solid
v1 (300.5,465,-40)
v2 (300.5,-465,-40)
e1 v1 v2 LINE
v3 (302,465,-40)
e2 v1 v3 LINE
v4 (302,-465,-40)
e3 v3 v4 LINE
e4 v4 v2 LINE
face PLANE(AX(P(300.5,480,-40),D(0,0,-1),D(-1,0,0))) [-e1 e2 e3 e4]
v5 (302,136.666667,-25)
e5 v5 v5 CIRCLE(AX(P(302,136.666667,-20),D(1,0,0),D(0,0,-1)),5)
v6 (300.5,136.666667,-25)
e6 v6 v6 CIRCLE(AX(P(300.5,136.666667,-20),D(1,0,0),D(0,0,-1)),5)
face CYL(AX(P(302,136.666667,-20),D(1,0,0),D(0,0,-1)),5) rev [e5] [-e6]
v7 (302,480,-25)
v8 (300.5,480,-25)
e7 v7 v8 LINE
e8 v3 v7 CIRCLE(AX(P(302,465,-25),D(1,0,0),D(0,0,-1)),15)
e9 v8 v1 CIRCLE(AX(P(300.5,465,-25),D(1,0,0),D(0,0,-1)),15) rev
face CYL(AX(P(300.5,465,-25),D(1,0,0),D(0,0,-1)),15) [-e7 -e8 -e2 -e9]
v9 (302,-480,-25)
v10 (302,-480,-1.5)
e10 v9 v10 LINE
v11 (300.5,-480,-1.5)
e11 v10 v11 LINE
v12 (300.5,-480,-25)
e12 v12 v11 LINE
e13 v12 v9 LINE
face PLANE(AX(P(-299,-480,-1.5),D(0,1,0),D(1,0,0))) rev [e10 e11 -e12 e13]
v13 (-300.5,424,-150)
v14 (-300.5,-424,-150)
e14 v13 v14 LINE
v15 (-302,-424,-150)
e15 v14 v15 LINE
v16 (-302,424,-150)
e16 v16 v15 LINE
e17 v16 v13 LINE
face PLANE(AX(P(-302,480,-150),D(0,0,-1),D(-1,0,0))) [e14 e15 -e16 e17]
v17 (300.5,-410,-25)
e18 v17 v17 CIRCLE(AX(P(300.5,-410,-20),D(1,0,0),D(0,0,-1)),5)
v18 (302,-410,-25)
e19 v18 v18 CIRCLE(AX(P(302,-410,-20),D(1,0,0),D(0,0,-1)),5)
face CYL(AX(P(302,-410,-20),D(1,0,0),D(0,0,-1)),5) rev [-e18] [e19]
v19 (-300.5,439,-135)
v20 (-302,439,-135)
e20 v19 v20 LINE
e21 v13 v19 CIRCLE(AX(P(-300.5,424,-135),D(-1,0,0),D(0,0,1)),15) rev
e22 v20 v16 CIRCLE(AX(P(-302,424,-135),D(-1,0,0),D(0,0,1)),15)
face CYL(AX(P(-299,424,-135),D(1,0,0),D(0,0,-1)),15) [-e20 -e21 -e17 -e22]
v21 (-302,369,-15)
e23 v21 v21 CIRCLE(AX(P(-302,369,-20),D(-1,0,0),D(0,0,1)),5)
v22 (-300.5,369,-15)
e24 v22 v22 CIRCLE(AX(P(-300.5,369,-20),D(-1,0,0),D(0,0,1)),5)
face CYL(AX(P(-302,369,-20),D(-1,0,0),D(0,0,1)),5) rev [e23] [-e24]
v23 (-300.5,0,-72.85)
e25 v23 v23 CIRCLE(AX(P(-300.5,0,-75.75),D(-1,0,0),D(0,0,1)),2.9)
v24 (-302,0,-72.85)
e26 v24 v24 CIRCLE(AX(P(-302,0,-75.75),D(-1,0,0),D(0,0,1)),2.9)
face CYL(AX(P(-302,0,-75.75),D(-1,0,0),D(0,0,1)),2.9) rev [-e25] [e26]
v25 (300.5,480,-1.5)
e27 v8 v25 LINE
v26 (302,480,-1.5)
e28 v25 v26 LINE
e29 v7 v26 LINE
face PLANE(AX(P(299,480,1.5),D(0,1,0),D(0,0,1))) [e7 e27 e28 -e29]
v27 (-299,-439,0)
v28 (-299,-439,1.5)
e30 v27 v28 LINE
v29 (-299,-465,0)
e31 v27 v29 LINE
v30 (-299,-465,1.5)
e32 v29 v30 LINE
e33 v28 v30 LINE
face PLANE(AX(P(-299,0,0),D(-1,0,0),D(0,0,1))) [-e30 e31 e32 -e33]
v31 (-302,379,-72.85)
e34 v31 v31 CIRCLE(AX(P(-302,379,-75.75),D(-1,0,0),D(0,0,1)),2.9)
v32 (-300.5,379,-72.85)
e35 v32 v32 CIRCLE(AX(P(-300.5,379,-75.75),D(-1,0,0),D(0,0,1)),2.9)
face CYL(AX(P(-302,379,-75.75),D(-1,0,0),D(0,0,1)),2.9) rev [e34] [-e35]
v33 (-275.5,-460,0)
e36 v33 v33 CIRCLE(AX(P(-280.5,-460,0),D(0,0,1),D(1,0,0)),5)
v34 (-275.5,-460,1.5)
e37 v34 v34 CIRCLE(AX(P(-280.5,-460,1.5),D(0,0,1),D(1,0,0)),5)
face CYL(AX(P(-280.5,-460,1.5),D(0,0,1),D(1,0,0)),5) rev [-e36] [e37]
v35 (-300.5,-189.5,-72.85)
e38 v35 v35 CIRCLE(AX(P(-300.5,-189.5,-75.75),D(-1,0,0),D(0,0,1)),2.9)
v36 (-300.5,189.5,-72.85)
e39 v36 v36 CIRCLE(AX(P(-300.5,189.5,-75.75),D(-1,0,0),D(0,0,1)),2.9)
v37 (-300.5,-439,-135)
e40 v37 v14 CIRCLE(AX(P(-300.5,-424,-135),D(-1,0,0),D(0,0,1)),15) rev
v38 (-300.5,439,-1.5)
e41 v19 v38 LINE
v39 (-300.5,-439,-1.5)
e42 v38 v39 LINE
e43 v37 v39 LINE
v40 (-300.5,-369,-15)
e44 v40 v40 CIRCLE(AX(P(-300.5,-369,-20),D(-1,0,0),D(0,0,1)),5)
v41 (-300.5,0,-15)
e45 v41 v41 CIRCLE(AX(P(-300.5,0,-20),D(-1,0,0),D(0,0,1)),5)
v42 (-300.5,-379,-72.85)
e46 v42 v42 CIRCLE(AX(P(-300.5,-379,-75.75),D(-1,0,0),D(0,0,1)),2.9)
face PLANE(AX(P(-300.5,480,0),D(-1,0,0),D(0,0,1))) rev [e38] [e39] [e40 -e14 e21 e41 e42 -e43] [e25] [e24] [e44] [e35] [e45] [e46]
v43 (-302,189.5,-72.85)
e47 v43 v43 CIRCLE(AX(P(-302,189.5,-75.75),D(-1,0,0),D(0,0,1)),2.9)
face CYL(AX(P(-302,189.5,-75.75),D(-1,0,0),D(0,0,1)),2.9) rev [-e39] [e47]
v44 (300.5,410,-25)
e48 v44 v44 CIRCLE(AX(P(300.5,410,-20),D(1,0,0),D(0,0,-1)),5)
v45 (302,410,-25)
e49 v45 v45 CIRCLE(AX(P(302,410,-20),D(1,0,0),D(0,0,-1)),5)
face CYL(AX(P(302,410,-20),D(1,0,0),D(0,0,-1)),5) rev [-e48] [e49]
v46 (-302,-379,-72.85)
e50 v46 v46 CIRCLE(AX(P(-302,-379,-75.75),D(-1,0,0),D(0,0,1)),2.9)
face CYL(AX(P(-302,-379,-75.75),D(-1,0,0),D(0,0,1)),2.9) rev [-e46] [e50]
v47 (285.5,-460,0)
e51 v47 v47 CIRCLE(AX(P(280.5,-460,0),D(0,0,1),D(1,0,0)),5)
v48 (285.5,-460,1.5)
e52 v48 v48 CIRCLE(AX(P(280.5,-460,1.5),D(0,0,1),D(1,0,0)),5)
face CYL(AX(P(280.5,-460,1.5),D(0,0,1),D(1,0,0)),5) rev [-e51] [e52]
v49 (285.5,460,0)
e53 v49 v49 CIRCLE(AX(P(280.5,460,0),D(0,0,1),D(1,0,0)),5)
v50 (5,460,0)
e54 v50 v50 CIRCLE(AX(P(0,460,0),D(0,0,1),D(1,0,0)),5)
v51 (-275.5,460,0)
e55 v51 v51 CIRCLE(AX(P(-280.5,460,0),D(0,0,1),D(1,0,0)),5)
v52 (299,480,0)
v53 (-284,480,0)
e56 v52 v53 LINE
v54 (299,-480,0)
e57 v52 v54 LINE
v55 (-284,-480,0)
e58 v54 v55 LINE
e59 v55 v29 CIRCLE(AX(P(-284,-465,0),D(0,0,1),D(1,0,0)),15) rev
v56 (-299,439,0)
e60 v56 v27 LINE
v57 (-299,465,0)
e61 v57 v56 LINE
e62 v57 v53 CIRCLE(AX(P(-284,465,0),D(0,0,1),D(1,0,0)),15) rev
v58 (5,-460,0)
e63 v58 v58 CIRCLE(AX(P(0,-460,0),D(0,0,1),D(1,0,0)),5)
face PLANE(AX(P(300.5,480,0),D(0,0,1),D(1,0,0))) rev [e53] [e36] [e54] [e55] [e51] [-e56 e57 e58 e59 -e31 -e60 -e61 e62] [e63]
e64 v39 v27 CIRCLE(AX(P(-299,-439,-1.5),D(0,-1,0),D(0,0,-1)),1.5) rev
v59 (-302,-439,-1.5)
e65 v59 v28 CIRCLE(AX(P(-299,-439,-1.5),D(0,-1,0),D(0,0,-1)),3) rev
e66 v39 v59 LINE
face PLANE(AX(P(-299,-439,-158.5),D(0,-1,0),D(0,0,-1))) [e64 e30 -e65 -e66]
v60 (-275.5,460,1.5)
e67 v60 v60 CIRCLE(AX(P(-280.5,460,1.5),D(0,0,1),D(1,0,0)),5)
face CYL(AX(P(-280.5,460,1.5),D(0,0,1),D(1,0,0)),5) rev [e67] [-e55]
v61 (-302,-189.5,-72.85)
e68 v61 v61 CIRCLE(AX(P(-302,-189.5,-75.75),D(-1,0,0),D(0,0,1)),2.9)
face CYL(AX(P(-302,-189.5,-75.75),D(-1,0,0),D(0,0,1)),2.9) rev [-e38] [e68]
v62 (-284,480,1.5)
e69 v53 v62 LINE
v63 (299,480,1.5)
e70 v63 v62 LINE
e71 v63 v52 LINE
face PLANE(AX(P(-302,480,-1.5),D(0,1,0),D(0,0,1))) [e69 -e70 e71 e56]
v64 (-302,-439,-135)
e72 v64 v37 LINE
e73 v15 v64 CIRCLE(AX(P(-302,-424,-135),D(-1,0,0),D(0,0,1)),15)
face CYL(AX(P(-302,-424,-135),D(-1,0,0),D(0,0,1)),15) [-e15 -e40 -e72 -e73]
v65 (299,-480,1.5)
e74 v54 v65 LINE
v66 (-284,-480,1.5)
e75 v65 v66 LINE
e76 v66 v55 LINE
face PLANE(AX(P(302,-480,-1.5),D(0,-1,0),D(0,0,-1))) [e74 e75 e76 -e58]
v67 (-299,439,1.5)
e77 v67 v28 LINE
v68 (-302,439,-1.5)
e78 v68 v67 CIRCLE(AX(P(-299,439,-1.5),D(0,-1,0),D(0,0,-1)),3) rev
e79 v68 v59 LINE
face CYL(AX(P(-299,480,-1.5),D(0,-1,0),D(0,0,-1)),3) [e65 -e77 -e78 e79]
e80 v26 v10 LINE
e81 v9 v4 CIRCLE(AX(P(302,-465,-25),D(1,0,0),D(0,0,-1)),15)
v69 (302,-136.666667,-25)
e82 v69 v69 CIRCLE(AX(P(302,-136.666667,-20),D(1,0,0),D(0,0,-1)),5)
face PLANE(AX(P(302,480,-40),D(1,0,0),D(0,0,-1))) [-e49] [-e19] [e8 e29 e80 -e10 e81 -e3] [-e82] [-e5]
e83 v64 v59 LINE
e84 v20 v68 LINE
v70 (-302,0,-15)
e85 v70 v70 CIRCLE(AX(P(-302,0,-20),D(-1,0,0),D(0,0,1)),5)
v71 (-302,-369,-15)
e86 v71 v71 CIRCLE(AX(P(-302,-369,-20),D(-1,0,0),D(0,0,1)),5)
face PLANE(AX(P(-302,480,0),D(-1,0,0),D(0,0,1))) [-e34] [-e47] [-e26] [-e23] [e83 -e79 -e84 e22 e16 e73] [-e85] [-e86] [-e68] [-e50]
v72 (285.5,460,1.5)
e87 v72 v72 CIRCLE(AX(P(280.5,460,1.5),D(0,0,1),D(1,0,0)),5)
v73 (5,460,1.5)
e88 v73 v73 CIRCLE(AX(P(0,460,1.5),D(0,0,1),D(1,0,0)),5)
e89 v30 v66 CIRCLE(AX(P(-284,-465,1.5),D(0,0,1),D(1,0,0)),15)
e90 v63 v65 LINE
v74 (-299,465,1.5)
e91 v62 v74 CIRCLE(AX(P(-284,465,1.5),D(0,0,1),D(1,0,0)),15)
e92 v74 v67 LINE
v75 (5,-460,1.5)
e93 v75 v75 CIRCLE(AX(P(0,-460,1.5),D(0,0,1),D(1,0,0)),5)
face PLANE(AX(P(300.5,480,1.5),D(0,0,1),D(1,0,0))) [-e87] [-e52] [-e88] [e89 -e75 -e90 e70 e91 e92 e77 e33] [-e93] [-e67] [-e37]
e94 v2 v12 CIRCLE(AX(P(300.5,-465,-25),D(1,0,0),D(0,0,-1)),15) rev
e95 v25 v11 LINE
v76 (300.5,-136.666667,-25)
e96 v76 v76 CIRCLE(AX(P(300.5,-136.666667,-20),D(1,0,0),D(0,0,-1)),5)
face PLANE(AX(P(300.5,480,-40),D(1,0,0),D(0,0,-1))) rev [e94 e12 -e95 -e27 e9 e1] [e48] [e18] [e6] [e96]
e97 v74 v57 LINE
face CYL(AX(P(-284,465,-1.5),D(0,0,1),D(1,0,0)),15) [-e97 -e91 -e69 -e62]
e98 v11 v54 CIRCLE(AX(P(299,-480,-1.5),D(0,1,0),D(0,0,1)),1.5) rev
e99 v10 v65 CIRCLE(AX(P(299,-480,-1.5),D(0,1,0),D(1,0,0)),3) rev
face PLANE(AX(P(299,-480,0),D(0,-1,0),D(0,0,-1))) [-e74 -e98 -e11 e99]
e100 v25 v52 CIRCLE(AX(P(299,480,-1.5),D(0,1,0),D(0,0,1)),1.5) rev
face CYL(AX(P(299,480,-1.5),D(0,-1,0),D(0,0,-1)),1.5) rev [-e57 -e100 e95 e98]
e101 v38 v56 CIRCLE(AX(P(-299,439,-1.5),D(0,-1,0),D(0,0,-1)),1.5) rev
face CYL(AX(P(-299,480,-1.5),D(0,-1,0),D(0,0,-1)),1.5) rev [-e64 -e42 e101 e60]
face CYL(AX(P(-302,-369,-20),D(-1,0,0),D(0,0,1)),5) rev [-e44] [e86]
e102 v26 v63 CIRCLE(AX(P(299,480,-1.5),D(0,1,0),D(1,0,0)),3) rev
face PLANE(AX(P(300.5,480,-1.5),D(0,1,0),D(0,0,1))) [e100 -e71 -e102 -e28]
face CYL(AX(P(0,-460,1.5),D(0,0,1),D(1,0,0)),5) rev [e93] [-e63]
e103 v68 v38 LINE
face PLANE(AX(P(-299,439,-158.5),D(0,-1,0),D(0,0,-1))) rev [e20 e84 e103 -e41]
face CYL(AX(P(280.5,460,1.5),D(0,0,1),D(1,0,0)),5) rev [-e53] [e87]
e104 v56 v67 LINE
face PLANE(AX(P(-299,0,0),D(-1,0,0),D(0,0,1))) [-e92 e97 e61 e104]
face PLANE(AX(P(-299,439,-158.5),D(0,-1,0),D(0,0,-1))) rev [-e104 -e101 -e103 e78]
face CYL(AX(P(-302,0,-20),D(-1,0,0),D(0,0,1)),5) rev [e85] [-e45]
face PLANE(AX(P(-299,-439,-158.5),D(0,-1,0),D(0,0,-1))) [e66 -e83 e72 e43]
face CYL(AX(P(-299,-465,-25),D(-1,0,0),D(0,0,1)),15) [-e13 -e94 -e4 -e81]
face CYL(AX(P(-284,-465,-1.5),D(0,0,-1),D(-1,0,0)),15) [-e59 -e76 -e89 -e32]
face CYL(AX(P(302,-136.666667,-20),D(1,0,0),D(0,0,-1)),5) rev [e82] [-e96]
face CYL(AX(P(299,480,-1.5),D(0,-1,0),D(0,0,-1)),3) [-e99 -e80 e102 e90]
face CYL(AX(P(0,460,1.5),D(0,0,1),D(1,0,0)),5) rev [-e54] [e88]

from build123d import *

# Parameters (mm, degrees)
BASE_FLANGE1_DEPTH            = 480
CUT_EXTRUDE1_START            = -3
SKETCH6_W                     = 170
SKETCH6_H                     = 41
CUT_EXTRUDE1_DEPTH            = 789.949107767
M5_CLEARANCE_HOLE1_D          = 5.8
FILLET1_R                     = 15
M8_CLEARANCE_HOLE1_AT_2_COUNT = 2
M8_CLEARANCE_HOLE1_AT_2_PITCH = 280.5
M8_CLEARANCE_HOLE1_AT_3_COUNT = 2
M8_CLEARANCE_HOLE1_AT_3_PITCH = 561
M8_CLEARANCE_HOLE2_D          = 10
M8_CLEARANCE_HOLE2_DEPTH      = 8.995696905
M8_CLEARANCE_HOLE2_TIP        = 3.004303095
M8_CLEARANCE_HOLE3_D          = 10
M8_CLEARANCE_HOLE3_DEPTH      = 8.995696905
M8_CLEARANCE_HOLE3_TIP        = 3.004303095


# Sheet-metal steps are written as plain solids
with BuildPart() as part:
    # Sketch1 → Base-Flange1 (new, symmetric)
    with BuildSketch(Plane(origin=(0, 0, 0), x_dir=(1, 0, 0), z_dir=(0, 1, 0))):
        with BuildLine():
            Line((300.5, 40), (300.5, 1.5))
            ThreePointArc((300.5, 1.5), (300.060660172, 0.439339828), (299, 0))
            Line((299, 0), (-299, 0))
            ThreePointArc((-299, 0), (-300.060660172, 0.439339828), (-300.5, 1.5))
            Line((-300.5, 1.5), (-300.5, 150))
            Line((-300.5, 150), (-302, 150))
            Line((-302, 150), (-302, 1.5))
            ThreePointArc((-302, 1.5), (-301.121320344, -0.621320344), (-299, -1.5))
            Line((-299, -1.5), (299, -1.5))
            ThreePointArc((299, -1.5), (301.121320344, -0.621320344), (302, 1.5))
            Line((302, 1.5), (302, 40))
            Line((302, 40), (300.5, 40))
        make_face()
    extrude(amount=BASE_FLANGE1_DEPTH, both=True)

    # Sketch6 → Cut-Extrude1 (cut)
    with BuildSketch(Plane.ZY.offset(302).offset(CUT_EXTRUDE1_START)):
        with Locations((-73.5, 459.5)):
            Rectangle(SKETCH6_W, SKETCH6_H)
    cut_extrude1 = extrude(amount=CUT_EXTRUDE1_DEPTH, mode=Mode.SUBTRACT)

    # Mirror1: Cut-Extrude1 across plane
    add(cut_extrude1.mirror(Plane.ZX), mode=Mode.SUBTRACT)

    # M5 Clearance Hole1 (through all)
    with Locations(Plane.ZY.offset(302)):
        with Locations((-75.75, -379), (-75.75, -189.5), (-75.75, 0), (-75.75, 189.5), (-75.75, 379)):
            Hole(M5_CLEARANCE_HOLE1_D / 2)

    # Fillet1
    fillet1_edges = [part.edges().sort_by_distance(p)[0] for p in [
        (301.25, -480, -40),
        (-299, -480, 0.75),
        (-299, 480, 0.75),
        (301.25, 480, -40),
        (-301.25, 439, -150),
        (-301.25, -439, -150),
    ]]
    fillet(fillet1_edges, radius=FILLET1_R)

    # Sketch10 → M8 Clearance Hole1 (revolve, cut)
    with BuildSketch(Plane(origin=(-280.5, 460, 1.5), x_dir=(0, -1, 0), z_dir=(1, 0, 0))):
        Polygon((0, 0), (0, 12), (5, 8.995696905), (5, 0), align=None)
    m8_clearance_hole1 = revolve(axis=Axis((-280.5, 460, 7.85), (0, 0, -1)), mode=Mode.SUBTRACT)

    # M8 Clearance Hole1 at 2: M8 Clearance Hole1 ×2
    with Locations(*[(i * M8_CLEARANCE_HOLE1_AT_2_PITCH, 0, 0) for i in range(1, M8_CLEARANCE_HOLE1_AT_2_COUNT)]):
        add(m8_clearance_hole1, mode=Mode.SUBTRACT)

    # M8 Clearance Hole1 at 3: M8 Clearance Hole1 ×2
    with Locations(*[(i * M8_CLEARANCE_HOLE1_AT_3_PITCH, 0, 0) for i in range(1, M8_CLEARANCE_HOLE1_AT_3_COUNT)]):
        add(m8_clearance_hole1, mode=Mode.SUBTRACT)

    # Mirror2: M8 Clearance Hole1 across plane
    add(m8_clearance_hole1.mirror(Plane.ZX), mode=Mode.SUBTRACT)

    # Mirror2 copy 1 sketch → Mirror2 copy 1 (revolve, cut)
    with BuildSketch(Plane(origin=(0, -460, 1.5), x_dir=(0, 1, 0), z_dir=(1, 0, 0))):
        Polygon((0, 0), (0, -12), (5, -8.995696905), (5, 0), align=None)
    revolve(axis=Axis((0, -460, 7.85), (0, 0, 1)), mode=Mode.SUBTRACT)

    # Mirror2 copy 2 sketch → Mirror2 copy 2 (revolve, cut)
    with BuildSketch(Plane(origin=(280.5, -460, 1.5), x_dir=(0, 1, 0), z_dir=(1, 0, 0))):
        Polygon((0, 0), (0, -12), (5, -8.995696905), (5, 0), align=None)
    revolve(axis=Axis((280.5, -460, 7.85), (0, 0, 1)), mode=Mode.SUBTRACT)

    # M8 Clearance Hole2
    with Locations(Plane(origin=(302, 0, 0), x_dir=(0, 0, -1), z_dir=(1, 0, 0))):
        with Locations((20, 410), (20, 136.666666667), (20, -136.666666667), (20, -410)):
            Hole(M8_CLEARANCE_HOLE2_D / 2, depth=M8_CLEARANCE_HOLE2_DEPTH)
            with Locations((0, 0, -(M8_CLEARANCE_HOLE2_DEPTH + M8_CLEARANCE_HOLE2_TIP / 2))):  # 118° drill point
                Cone(0, M8_CLEARANCE_HOLE2_D / 2, M8_CLEARANCE_HOLE2_TIP, mode=Mode.SUBTRACT)

    # M8 Clearance Hole3
    with Locations(Plane.ZY.offset(302)):
        with Locations((-20, 369), (-20, 0), (-20, -369)):
            Hole(M8_CLEARANCE_HOLE3_D / 2, depth=M8_CLEARANCE_HOLE3_DEPTH)
            with Locations((0, 0, -(M8_CLEARANCE_HOLE3_DEPTH + M8_CLEARANCE_HOLE3_TIP / 2))):  # 118° drill point
                Cone(0, M8_CLEARANCE_HOLE3_D / 2, M8_CLEARANCE_HOLE3_TIP, mode=Mode.SUBTRACT)


solid = part.part
